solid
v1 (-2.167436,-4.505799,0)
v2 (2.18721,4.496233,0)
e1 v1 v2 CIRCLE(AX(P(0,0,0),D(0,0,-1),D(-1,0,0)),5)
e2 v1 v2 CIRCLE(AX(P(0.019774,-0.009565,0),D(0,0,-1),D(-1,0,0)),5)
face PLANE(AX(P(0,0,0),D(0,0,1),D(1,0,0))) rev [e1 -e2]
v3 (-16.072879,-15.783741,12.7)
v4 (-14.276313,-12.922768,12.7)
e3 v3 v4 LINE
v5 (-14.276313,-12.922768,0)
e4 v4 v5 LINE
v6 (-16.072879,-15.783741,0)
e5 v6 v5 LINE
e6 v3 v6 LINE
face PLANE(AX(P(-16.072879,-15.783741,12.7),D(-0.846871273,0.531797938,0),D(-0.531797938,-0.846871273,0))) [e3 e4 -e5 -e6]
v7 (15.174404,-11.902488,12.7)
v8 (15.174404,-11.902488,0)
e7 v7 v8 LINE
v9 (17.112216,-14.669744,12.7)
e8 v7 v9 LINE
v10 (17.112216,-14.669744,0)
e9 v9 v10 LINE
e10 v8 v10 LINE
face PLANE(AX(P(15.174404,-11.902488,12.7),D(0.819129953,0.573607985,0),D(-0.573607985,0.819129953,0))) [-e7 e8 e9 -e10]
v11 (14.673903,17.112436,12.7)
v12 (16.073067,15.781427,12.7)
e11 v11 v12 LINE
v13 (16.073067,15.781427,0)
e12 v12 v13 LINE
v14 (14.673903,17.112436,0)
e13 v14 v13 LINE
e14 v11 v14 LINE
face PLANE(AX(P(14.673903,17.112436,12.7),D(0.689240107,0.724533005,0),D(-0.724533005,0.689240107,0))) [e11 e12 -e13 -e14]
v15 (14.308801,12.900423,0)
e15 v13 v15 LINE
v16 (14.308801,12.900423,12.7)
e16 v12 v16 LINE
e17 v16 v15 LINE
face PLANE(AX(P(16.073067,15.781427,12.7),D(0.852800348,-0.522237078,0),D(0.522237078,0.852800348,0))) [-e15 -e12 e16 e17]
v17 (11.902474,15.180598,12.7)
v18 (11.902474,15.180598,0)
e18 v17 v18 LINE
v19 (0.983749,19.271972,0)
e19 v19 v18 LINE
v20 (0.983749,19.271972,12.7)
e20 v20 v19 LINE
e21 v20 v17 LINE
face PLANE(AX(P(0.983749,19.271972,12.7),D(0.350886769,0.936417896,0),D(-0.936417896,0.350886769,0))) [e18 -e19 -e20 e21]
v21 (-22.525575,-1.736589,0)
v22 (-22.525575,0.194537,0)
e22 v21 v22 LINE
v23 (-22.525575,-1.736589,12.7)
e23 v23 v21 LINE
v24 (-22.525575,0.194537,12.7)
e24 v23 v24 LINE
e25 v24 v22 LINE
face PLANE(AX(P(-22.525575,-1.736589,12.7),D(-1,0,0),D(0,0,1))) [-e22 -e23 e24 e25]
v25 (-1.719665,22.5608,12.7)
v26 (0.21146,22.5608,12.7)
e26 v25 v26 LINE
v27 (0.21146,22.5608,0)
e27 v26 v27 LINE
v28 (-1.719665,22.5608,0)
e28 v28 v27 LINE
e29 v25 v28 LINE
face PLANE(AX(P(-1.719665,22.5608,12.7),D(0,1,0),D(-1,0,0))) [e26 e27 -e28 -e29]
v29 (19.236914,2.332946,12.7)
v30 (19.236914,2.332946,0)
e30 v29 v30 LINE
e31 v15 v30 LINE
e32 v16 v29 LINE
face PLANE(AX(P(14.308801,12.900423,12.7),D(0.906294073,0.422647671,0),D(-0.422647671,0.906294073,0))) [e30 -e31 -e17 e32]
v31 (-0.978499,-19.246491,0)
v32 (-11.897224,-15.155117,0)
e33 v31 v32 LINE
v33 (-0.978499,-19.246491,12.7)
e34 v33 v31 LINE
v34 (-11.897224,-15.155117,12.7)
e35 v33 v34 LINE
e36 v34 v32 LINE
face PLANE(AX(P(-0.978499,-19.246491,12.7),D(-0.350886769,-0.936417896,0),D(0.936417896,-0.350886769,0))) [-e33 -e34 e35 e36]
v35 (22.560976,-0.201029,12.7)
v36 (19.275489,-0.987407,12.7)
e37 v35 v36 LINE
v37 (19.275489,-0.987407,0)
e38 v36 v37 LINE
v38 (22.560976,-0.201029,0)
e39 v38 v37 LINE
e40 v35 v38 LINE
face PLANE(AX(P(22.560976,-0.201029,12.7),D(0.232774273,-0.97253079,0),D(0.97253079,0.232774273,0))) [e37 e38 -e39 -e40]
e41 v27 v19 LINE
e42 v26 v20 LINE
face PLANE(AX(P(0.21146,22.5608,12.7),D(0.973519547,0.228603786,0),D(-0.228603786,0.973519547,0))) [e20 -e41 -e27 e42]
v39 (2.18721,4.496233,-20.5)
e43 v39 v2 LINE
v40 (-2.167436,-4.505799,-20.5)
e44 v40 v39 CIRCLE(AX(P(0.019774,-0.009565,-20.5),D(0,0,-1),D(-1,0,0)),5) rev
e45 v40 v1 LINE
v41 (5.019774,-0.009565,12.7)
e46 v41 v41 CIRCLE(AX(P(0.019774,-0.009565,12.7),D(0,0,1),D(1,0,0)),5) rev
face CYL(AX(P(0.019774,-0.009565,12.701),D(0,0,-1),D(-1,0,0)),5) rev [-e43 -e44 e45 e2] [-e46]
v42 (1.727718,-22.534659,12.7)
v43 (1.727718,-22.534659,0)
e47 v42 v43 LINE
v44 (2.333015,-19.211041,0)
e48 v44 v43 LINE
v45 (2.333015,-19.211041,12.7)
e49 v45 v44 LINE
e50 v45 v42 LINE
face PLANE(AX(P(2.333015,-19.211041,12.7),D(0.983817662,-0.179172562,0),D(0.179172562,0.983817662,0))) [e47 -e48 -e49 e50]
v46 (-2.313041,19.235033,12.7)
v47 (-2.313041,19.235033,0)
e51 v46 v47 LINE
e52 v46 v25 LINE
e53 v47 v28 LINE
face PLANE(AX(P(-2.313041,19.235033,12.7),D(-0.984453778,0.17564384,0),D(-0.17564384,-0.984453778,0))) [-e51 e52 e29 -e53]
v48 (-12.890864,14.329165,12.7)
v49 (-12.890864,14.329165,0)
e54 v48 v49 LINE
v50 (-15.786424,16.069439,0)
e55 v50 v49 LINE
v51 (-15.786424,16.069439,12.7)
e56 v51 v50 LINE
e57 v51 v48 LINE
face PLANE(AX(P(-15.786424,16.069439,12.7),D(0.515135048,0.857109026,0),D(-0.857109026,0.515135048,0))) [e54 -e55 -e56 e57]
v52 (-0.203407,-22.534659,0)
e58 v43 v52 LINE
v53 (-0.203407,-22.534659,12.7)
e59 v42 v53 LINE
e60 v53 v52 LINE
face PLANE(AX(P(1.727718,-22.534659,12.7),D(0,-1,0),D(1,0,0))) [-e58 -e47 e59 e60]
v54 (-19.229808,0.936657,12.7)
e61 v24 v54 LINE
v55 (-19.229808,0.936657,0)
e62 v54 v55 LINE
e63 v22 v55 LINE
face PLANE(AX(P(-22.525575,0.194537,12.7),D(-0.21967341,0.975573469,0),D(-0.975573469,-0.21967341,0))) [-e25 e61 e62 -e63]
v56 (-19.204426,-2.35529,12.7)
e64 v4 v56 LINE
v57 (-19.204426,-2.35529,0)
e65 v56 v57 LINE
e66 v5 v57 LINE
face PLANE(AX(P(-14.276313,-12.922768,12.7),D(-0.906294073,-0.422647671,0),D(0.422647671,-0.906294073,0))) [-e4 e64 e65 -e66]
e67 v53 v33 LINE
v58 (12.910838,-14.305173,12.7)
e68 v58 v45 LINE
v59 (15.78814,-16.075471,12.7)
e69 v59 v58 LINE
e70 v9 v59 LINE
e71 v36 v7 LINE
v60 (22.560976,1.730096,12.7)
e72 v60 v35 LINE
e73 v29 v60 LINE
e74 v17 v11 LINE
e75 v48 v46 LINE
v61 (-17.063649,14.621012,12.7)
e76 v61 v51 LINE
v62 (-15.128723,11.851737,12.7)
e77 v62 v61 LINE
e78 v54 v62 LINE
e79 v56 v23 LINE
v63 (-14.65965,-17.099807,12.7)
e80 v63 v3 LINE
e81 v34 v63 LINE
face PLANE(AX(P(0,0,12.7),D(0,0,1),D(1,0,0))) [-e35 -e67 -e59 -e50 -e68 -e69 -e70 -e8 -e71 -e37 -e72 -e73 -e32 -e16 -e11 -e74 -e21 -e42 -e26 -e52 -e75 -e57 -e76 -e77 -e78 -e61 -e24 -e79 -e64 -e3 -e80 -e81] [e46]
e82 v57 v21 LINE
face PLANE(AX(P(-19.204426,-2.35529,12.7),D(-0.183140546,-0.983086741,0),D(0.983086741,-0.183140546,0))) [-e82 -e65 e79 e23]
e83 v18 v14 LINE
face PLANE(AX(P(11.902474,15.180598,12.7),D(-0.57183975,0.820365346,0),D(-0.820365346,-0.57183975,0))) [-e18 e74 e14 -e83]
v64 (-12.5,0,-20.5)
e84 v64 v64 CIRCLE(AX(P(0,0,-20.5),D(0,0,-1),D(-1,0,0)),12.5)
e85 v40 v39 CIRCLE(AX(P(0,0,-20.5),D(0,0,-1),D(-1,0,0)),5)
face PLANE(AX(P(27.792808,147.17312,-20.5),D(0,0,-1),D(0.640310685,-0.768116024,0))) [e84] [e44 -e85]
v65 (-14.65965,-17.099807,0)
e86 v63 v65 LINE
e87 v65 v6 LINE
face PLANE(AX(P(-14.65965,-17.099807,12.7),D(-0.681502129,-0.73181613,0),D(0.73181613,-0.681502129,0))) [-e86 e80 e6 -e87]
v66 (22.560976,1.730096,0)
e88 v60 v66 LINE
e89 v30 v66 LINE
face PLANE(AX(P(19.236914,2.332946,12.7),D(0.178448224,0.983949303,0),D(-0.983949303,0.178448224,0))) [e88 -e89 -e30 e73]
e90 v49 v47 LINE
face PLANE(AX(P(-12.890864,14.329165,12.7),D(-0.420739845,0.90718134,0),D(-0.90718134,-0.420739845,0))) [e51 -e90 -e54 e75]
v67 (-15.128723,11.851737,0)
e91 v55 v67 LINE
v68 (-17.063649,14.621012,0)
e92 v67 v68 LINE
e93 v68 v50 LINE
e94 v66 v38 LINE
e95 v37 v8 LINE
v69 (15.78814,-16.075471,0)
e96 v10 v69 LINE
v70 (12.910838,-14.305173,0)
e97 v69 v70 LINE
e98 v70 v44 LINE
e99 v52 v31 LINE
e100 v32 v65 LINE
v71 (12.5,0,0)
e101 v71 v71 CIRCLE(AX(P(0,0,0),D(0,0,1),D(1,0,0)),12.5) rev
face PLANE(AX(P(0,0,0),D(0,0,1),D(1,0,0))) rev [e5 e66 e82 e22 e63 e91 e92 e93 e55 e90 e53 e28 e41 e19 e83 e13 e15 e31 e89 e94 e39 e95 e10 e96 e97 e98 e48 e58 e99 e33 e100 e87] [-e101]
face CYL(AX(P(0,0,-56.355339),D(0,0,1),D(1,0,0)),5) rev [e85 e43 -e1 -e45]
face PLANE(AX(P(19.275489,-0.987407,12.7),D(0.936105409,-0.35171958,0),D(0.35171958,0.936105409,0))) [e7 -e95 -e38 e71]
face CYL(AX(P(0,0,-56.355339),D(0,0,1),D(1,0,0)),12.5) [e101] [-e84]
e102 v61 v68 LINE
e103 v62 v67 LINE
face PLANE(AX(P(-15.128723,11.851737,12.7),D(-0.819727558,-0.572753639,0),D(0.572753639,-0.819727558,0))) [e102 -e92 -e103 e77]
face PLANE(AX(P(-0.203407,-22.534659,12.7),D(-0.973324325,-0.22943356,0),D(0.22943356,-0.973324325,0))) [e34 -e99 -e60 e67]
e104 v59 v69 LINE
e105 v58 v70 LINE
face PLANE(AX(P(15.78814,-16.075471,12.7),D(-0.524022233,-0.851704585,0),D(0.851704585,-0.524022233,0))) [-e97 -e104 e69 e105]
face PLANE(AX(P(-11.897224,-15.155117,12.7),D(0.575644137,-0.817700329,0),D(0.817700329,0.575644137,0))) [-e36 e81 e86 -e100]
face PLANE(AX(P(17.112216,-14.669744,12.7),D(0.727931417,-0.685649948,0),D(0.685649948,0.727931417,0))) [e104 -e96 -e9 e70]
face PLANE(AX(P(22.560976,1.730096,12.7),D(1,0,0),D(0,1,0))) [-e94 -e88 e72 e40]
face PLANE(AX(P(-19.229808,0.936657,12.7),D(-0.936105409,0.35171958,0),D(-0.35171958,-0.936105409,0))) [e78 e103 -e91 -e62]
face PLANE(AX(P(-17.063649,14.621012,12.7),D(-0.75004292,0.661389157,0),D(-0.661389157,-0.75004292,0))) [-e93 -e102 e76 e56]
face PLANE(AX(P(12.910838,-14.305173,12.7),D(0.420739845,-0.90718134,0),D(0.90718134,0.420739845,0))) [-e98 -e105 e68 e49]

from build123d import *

# Parameters (mm, degrees)
BOSS_EXTRUDE1_DEPTH     = 12.7
CUT_EXTRUDE1_REACH      = 36.341
SKETCH2_R               = 5
BOSS_EXTRUDE3_OUTLINE_R = 12.5
BOSS_EXTRUDE3_DEPTH     = 20.5


# Read off the part's stored shape, not the designer's step: Boss-Extrude3
with BuildPart() as part:
    # Sketch1 → Boss-Extrude1 (new body)
    with BuildSketch(Plane(origin=(0, 0, 0), x_dir=(-1, 0, 0), z_dir=(0, 0, -1))):
        Polygon((22.52557458, -1.736588639), (22.52557458, 0.194536921), (19.229808022, 0.93665661), (15.128723263, 11.851737372), (17.063649078, 14.621011813), (15.786423571, 16.069438867), (12.890863827, 14.329165151), (2.313040546, 19.235032954), (1.719665356, 22.560799741), (-0.211460204, 22.560799741), (-0.98374926, 19.271971918), (-11.902473648, 15.180597821), (-14.673902719, 17.112436257), (-16.073066924, 15.781427071), (-14.308800518, 12.900423272), (-19.236913758, 2.332945609), (-22.560976284, 1.730096406), (-22.560976284, -0.201029153), (-19.275488766, -0.987407309), (-15.174404006, -11.902488071), (-17.112216048, -14.669743631), (-15.788139908, -16.075470597), (-12.910837913, -14.305173427), (-2.333014633, -19.21104123), (-1.727718406, -22.534659035), (0.203407153, -22.534659035), (0.978499423, -19.246490729), (11.89722381, -15.155116632), (14.659649692, -17.099807376), (16.072878525, -15.783741196), (14.276312796, -12.922767512), (19.204426036, -2.355289849), align=None)
    extrude(amount=-BOSS_EXTRUDE1_DEPTH)

    # Sketch2 → Cut-Extrude1 (cut, up to next)
    with BuildSketch(Plane(origin=(0, 0, 0), x_dir=(-1, 0, 0), z_dir=(0, 0, -1)), mode=Mode.PRIVATE) as cut_extrude1_sk1:
        with Locations((-0.019773646, -0.00956531)):
            Circle(SKETCH2_R)
    cut_extrude1_tool1 = extrude(cut_extrude1_sk1.sketch, amount=-CUT_EXTRUDE1_REACH, mode=Mode.PRIVATE) & part.part
    add(cut_extrude1_tool1.solids().sort_by_distance((0.019774, -0.009565, 0))[0], mode=Mode.SUBTRACT)

    # Boss-Extrude3 outline → Boss-Extrude3 (add)
    with BuildSketch(Plane(origin=(0, 0, 0), x_dir=(-1, 0, 0), z_dir=(0, 0, -1))):
        Circle(BOSS_EXTRUDE3_OUTLINE_R)
        with BuildLine():
            ThreePointArc((2.167436153, -4.505798544), (-4.520800394, -2.186893539), (-2.187209799, 4.496233234))
            ThreePointArc((-2.187209799, 4.496233234), (4.501026748, 2.177328229), (2.167436153, -4.505798544))
        make_face(mode=Mode.SUBTRACT)
    extrude(amount=BOSS_EXTRUDE3_DEPTH)


solid = part.part
